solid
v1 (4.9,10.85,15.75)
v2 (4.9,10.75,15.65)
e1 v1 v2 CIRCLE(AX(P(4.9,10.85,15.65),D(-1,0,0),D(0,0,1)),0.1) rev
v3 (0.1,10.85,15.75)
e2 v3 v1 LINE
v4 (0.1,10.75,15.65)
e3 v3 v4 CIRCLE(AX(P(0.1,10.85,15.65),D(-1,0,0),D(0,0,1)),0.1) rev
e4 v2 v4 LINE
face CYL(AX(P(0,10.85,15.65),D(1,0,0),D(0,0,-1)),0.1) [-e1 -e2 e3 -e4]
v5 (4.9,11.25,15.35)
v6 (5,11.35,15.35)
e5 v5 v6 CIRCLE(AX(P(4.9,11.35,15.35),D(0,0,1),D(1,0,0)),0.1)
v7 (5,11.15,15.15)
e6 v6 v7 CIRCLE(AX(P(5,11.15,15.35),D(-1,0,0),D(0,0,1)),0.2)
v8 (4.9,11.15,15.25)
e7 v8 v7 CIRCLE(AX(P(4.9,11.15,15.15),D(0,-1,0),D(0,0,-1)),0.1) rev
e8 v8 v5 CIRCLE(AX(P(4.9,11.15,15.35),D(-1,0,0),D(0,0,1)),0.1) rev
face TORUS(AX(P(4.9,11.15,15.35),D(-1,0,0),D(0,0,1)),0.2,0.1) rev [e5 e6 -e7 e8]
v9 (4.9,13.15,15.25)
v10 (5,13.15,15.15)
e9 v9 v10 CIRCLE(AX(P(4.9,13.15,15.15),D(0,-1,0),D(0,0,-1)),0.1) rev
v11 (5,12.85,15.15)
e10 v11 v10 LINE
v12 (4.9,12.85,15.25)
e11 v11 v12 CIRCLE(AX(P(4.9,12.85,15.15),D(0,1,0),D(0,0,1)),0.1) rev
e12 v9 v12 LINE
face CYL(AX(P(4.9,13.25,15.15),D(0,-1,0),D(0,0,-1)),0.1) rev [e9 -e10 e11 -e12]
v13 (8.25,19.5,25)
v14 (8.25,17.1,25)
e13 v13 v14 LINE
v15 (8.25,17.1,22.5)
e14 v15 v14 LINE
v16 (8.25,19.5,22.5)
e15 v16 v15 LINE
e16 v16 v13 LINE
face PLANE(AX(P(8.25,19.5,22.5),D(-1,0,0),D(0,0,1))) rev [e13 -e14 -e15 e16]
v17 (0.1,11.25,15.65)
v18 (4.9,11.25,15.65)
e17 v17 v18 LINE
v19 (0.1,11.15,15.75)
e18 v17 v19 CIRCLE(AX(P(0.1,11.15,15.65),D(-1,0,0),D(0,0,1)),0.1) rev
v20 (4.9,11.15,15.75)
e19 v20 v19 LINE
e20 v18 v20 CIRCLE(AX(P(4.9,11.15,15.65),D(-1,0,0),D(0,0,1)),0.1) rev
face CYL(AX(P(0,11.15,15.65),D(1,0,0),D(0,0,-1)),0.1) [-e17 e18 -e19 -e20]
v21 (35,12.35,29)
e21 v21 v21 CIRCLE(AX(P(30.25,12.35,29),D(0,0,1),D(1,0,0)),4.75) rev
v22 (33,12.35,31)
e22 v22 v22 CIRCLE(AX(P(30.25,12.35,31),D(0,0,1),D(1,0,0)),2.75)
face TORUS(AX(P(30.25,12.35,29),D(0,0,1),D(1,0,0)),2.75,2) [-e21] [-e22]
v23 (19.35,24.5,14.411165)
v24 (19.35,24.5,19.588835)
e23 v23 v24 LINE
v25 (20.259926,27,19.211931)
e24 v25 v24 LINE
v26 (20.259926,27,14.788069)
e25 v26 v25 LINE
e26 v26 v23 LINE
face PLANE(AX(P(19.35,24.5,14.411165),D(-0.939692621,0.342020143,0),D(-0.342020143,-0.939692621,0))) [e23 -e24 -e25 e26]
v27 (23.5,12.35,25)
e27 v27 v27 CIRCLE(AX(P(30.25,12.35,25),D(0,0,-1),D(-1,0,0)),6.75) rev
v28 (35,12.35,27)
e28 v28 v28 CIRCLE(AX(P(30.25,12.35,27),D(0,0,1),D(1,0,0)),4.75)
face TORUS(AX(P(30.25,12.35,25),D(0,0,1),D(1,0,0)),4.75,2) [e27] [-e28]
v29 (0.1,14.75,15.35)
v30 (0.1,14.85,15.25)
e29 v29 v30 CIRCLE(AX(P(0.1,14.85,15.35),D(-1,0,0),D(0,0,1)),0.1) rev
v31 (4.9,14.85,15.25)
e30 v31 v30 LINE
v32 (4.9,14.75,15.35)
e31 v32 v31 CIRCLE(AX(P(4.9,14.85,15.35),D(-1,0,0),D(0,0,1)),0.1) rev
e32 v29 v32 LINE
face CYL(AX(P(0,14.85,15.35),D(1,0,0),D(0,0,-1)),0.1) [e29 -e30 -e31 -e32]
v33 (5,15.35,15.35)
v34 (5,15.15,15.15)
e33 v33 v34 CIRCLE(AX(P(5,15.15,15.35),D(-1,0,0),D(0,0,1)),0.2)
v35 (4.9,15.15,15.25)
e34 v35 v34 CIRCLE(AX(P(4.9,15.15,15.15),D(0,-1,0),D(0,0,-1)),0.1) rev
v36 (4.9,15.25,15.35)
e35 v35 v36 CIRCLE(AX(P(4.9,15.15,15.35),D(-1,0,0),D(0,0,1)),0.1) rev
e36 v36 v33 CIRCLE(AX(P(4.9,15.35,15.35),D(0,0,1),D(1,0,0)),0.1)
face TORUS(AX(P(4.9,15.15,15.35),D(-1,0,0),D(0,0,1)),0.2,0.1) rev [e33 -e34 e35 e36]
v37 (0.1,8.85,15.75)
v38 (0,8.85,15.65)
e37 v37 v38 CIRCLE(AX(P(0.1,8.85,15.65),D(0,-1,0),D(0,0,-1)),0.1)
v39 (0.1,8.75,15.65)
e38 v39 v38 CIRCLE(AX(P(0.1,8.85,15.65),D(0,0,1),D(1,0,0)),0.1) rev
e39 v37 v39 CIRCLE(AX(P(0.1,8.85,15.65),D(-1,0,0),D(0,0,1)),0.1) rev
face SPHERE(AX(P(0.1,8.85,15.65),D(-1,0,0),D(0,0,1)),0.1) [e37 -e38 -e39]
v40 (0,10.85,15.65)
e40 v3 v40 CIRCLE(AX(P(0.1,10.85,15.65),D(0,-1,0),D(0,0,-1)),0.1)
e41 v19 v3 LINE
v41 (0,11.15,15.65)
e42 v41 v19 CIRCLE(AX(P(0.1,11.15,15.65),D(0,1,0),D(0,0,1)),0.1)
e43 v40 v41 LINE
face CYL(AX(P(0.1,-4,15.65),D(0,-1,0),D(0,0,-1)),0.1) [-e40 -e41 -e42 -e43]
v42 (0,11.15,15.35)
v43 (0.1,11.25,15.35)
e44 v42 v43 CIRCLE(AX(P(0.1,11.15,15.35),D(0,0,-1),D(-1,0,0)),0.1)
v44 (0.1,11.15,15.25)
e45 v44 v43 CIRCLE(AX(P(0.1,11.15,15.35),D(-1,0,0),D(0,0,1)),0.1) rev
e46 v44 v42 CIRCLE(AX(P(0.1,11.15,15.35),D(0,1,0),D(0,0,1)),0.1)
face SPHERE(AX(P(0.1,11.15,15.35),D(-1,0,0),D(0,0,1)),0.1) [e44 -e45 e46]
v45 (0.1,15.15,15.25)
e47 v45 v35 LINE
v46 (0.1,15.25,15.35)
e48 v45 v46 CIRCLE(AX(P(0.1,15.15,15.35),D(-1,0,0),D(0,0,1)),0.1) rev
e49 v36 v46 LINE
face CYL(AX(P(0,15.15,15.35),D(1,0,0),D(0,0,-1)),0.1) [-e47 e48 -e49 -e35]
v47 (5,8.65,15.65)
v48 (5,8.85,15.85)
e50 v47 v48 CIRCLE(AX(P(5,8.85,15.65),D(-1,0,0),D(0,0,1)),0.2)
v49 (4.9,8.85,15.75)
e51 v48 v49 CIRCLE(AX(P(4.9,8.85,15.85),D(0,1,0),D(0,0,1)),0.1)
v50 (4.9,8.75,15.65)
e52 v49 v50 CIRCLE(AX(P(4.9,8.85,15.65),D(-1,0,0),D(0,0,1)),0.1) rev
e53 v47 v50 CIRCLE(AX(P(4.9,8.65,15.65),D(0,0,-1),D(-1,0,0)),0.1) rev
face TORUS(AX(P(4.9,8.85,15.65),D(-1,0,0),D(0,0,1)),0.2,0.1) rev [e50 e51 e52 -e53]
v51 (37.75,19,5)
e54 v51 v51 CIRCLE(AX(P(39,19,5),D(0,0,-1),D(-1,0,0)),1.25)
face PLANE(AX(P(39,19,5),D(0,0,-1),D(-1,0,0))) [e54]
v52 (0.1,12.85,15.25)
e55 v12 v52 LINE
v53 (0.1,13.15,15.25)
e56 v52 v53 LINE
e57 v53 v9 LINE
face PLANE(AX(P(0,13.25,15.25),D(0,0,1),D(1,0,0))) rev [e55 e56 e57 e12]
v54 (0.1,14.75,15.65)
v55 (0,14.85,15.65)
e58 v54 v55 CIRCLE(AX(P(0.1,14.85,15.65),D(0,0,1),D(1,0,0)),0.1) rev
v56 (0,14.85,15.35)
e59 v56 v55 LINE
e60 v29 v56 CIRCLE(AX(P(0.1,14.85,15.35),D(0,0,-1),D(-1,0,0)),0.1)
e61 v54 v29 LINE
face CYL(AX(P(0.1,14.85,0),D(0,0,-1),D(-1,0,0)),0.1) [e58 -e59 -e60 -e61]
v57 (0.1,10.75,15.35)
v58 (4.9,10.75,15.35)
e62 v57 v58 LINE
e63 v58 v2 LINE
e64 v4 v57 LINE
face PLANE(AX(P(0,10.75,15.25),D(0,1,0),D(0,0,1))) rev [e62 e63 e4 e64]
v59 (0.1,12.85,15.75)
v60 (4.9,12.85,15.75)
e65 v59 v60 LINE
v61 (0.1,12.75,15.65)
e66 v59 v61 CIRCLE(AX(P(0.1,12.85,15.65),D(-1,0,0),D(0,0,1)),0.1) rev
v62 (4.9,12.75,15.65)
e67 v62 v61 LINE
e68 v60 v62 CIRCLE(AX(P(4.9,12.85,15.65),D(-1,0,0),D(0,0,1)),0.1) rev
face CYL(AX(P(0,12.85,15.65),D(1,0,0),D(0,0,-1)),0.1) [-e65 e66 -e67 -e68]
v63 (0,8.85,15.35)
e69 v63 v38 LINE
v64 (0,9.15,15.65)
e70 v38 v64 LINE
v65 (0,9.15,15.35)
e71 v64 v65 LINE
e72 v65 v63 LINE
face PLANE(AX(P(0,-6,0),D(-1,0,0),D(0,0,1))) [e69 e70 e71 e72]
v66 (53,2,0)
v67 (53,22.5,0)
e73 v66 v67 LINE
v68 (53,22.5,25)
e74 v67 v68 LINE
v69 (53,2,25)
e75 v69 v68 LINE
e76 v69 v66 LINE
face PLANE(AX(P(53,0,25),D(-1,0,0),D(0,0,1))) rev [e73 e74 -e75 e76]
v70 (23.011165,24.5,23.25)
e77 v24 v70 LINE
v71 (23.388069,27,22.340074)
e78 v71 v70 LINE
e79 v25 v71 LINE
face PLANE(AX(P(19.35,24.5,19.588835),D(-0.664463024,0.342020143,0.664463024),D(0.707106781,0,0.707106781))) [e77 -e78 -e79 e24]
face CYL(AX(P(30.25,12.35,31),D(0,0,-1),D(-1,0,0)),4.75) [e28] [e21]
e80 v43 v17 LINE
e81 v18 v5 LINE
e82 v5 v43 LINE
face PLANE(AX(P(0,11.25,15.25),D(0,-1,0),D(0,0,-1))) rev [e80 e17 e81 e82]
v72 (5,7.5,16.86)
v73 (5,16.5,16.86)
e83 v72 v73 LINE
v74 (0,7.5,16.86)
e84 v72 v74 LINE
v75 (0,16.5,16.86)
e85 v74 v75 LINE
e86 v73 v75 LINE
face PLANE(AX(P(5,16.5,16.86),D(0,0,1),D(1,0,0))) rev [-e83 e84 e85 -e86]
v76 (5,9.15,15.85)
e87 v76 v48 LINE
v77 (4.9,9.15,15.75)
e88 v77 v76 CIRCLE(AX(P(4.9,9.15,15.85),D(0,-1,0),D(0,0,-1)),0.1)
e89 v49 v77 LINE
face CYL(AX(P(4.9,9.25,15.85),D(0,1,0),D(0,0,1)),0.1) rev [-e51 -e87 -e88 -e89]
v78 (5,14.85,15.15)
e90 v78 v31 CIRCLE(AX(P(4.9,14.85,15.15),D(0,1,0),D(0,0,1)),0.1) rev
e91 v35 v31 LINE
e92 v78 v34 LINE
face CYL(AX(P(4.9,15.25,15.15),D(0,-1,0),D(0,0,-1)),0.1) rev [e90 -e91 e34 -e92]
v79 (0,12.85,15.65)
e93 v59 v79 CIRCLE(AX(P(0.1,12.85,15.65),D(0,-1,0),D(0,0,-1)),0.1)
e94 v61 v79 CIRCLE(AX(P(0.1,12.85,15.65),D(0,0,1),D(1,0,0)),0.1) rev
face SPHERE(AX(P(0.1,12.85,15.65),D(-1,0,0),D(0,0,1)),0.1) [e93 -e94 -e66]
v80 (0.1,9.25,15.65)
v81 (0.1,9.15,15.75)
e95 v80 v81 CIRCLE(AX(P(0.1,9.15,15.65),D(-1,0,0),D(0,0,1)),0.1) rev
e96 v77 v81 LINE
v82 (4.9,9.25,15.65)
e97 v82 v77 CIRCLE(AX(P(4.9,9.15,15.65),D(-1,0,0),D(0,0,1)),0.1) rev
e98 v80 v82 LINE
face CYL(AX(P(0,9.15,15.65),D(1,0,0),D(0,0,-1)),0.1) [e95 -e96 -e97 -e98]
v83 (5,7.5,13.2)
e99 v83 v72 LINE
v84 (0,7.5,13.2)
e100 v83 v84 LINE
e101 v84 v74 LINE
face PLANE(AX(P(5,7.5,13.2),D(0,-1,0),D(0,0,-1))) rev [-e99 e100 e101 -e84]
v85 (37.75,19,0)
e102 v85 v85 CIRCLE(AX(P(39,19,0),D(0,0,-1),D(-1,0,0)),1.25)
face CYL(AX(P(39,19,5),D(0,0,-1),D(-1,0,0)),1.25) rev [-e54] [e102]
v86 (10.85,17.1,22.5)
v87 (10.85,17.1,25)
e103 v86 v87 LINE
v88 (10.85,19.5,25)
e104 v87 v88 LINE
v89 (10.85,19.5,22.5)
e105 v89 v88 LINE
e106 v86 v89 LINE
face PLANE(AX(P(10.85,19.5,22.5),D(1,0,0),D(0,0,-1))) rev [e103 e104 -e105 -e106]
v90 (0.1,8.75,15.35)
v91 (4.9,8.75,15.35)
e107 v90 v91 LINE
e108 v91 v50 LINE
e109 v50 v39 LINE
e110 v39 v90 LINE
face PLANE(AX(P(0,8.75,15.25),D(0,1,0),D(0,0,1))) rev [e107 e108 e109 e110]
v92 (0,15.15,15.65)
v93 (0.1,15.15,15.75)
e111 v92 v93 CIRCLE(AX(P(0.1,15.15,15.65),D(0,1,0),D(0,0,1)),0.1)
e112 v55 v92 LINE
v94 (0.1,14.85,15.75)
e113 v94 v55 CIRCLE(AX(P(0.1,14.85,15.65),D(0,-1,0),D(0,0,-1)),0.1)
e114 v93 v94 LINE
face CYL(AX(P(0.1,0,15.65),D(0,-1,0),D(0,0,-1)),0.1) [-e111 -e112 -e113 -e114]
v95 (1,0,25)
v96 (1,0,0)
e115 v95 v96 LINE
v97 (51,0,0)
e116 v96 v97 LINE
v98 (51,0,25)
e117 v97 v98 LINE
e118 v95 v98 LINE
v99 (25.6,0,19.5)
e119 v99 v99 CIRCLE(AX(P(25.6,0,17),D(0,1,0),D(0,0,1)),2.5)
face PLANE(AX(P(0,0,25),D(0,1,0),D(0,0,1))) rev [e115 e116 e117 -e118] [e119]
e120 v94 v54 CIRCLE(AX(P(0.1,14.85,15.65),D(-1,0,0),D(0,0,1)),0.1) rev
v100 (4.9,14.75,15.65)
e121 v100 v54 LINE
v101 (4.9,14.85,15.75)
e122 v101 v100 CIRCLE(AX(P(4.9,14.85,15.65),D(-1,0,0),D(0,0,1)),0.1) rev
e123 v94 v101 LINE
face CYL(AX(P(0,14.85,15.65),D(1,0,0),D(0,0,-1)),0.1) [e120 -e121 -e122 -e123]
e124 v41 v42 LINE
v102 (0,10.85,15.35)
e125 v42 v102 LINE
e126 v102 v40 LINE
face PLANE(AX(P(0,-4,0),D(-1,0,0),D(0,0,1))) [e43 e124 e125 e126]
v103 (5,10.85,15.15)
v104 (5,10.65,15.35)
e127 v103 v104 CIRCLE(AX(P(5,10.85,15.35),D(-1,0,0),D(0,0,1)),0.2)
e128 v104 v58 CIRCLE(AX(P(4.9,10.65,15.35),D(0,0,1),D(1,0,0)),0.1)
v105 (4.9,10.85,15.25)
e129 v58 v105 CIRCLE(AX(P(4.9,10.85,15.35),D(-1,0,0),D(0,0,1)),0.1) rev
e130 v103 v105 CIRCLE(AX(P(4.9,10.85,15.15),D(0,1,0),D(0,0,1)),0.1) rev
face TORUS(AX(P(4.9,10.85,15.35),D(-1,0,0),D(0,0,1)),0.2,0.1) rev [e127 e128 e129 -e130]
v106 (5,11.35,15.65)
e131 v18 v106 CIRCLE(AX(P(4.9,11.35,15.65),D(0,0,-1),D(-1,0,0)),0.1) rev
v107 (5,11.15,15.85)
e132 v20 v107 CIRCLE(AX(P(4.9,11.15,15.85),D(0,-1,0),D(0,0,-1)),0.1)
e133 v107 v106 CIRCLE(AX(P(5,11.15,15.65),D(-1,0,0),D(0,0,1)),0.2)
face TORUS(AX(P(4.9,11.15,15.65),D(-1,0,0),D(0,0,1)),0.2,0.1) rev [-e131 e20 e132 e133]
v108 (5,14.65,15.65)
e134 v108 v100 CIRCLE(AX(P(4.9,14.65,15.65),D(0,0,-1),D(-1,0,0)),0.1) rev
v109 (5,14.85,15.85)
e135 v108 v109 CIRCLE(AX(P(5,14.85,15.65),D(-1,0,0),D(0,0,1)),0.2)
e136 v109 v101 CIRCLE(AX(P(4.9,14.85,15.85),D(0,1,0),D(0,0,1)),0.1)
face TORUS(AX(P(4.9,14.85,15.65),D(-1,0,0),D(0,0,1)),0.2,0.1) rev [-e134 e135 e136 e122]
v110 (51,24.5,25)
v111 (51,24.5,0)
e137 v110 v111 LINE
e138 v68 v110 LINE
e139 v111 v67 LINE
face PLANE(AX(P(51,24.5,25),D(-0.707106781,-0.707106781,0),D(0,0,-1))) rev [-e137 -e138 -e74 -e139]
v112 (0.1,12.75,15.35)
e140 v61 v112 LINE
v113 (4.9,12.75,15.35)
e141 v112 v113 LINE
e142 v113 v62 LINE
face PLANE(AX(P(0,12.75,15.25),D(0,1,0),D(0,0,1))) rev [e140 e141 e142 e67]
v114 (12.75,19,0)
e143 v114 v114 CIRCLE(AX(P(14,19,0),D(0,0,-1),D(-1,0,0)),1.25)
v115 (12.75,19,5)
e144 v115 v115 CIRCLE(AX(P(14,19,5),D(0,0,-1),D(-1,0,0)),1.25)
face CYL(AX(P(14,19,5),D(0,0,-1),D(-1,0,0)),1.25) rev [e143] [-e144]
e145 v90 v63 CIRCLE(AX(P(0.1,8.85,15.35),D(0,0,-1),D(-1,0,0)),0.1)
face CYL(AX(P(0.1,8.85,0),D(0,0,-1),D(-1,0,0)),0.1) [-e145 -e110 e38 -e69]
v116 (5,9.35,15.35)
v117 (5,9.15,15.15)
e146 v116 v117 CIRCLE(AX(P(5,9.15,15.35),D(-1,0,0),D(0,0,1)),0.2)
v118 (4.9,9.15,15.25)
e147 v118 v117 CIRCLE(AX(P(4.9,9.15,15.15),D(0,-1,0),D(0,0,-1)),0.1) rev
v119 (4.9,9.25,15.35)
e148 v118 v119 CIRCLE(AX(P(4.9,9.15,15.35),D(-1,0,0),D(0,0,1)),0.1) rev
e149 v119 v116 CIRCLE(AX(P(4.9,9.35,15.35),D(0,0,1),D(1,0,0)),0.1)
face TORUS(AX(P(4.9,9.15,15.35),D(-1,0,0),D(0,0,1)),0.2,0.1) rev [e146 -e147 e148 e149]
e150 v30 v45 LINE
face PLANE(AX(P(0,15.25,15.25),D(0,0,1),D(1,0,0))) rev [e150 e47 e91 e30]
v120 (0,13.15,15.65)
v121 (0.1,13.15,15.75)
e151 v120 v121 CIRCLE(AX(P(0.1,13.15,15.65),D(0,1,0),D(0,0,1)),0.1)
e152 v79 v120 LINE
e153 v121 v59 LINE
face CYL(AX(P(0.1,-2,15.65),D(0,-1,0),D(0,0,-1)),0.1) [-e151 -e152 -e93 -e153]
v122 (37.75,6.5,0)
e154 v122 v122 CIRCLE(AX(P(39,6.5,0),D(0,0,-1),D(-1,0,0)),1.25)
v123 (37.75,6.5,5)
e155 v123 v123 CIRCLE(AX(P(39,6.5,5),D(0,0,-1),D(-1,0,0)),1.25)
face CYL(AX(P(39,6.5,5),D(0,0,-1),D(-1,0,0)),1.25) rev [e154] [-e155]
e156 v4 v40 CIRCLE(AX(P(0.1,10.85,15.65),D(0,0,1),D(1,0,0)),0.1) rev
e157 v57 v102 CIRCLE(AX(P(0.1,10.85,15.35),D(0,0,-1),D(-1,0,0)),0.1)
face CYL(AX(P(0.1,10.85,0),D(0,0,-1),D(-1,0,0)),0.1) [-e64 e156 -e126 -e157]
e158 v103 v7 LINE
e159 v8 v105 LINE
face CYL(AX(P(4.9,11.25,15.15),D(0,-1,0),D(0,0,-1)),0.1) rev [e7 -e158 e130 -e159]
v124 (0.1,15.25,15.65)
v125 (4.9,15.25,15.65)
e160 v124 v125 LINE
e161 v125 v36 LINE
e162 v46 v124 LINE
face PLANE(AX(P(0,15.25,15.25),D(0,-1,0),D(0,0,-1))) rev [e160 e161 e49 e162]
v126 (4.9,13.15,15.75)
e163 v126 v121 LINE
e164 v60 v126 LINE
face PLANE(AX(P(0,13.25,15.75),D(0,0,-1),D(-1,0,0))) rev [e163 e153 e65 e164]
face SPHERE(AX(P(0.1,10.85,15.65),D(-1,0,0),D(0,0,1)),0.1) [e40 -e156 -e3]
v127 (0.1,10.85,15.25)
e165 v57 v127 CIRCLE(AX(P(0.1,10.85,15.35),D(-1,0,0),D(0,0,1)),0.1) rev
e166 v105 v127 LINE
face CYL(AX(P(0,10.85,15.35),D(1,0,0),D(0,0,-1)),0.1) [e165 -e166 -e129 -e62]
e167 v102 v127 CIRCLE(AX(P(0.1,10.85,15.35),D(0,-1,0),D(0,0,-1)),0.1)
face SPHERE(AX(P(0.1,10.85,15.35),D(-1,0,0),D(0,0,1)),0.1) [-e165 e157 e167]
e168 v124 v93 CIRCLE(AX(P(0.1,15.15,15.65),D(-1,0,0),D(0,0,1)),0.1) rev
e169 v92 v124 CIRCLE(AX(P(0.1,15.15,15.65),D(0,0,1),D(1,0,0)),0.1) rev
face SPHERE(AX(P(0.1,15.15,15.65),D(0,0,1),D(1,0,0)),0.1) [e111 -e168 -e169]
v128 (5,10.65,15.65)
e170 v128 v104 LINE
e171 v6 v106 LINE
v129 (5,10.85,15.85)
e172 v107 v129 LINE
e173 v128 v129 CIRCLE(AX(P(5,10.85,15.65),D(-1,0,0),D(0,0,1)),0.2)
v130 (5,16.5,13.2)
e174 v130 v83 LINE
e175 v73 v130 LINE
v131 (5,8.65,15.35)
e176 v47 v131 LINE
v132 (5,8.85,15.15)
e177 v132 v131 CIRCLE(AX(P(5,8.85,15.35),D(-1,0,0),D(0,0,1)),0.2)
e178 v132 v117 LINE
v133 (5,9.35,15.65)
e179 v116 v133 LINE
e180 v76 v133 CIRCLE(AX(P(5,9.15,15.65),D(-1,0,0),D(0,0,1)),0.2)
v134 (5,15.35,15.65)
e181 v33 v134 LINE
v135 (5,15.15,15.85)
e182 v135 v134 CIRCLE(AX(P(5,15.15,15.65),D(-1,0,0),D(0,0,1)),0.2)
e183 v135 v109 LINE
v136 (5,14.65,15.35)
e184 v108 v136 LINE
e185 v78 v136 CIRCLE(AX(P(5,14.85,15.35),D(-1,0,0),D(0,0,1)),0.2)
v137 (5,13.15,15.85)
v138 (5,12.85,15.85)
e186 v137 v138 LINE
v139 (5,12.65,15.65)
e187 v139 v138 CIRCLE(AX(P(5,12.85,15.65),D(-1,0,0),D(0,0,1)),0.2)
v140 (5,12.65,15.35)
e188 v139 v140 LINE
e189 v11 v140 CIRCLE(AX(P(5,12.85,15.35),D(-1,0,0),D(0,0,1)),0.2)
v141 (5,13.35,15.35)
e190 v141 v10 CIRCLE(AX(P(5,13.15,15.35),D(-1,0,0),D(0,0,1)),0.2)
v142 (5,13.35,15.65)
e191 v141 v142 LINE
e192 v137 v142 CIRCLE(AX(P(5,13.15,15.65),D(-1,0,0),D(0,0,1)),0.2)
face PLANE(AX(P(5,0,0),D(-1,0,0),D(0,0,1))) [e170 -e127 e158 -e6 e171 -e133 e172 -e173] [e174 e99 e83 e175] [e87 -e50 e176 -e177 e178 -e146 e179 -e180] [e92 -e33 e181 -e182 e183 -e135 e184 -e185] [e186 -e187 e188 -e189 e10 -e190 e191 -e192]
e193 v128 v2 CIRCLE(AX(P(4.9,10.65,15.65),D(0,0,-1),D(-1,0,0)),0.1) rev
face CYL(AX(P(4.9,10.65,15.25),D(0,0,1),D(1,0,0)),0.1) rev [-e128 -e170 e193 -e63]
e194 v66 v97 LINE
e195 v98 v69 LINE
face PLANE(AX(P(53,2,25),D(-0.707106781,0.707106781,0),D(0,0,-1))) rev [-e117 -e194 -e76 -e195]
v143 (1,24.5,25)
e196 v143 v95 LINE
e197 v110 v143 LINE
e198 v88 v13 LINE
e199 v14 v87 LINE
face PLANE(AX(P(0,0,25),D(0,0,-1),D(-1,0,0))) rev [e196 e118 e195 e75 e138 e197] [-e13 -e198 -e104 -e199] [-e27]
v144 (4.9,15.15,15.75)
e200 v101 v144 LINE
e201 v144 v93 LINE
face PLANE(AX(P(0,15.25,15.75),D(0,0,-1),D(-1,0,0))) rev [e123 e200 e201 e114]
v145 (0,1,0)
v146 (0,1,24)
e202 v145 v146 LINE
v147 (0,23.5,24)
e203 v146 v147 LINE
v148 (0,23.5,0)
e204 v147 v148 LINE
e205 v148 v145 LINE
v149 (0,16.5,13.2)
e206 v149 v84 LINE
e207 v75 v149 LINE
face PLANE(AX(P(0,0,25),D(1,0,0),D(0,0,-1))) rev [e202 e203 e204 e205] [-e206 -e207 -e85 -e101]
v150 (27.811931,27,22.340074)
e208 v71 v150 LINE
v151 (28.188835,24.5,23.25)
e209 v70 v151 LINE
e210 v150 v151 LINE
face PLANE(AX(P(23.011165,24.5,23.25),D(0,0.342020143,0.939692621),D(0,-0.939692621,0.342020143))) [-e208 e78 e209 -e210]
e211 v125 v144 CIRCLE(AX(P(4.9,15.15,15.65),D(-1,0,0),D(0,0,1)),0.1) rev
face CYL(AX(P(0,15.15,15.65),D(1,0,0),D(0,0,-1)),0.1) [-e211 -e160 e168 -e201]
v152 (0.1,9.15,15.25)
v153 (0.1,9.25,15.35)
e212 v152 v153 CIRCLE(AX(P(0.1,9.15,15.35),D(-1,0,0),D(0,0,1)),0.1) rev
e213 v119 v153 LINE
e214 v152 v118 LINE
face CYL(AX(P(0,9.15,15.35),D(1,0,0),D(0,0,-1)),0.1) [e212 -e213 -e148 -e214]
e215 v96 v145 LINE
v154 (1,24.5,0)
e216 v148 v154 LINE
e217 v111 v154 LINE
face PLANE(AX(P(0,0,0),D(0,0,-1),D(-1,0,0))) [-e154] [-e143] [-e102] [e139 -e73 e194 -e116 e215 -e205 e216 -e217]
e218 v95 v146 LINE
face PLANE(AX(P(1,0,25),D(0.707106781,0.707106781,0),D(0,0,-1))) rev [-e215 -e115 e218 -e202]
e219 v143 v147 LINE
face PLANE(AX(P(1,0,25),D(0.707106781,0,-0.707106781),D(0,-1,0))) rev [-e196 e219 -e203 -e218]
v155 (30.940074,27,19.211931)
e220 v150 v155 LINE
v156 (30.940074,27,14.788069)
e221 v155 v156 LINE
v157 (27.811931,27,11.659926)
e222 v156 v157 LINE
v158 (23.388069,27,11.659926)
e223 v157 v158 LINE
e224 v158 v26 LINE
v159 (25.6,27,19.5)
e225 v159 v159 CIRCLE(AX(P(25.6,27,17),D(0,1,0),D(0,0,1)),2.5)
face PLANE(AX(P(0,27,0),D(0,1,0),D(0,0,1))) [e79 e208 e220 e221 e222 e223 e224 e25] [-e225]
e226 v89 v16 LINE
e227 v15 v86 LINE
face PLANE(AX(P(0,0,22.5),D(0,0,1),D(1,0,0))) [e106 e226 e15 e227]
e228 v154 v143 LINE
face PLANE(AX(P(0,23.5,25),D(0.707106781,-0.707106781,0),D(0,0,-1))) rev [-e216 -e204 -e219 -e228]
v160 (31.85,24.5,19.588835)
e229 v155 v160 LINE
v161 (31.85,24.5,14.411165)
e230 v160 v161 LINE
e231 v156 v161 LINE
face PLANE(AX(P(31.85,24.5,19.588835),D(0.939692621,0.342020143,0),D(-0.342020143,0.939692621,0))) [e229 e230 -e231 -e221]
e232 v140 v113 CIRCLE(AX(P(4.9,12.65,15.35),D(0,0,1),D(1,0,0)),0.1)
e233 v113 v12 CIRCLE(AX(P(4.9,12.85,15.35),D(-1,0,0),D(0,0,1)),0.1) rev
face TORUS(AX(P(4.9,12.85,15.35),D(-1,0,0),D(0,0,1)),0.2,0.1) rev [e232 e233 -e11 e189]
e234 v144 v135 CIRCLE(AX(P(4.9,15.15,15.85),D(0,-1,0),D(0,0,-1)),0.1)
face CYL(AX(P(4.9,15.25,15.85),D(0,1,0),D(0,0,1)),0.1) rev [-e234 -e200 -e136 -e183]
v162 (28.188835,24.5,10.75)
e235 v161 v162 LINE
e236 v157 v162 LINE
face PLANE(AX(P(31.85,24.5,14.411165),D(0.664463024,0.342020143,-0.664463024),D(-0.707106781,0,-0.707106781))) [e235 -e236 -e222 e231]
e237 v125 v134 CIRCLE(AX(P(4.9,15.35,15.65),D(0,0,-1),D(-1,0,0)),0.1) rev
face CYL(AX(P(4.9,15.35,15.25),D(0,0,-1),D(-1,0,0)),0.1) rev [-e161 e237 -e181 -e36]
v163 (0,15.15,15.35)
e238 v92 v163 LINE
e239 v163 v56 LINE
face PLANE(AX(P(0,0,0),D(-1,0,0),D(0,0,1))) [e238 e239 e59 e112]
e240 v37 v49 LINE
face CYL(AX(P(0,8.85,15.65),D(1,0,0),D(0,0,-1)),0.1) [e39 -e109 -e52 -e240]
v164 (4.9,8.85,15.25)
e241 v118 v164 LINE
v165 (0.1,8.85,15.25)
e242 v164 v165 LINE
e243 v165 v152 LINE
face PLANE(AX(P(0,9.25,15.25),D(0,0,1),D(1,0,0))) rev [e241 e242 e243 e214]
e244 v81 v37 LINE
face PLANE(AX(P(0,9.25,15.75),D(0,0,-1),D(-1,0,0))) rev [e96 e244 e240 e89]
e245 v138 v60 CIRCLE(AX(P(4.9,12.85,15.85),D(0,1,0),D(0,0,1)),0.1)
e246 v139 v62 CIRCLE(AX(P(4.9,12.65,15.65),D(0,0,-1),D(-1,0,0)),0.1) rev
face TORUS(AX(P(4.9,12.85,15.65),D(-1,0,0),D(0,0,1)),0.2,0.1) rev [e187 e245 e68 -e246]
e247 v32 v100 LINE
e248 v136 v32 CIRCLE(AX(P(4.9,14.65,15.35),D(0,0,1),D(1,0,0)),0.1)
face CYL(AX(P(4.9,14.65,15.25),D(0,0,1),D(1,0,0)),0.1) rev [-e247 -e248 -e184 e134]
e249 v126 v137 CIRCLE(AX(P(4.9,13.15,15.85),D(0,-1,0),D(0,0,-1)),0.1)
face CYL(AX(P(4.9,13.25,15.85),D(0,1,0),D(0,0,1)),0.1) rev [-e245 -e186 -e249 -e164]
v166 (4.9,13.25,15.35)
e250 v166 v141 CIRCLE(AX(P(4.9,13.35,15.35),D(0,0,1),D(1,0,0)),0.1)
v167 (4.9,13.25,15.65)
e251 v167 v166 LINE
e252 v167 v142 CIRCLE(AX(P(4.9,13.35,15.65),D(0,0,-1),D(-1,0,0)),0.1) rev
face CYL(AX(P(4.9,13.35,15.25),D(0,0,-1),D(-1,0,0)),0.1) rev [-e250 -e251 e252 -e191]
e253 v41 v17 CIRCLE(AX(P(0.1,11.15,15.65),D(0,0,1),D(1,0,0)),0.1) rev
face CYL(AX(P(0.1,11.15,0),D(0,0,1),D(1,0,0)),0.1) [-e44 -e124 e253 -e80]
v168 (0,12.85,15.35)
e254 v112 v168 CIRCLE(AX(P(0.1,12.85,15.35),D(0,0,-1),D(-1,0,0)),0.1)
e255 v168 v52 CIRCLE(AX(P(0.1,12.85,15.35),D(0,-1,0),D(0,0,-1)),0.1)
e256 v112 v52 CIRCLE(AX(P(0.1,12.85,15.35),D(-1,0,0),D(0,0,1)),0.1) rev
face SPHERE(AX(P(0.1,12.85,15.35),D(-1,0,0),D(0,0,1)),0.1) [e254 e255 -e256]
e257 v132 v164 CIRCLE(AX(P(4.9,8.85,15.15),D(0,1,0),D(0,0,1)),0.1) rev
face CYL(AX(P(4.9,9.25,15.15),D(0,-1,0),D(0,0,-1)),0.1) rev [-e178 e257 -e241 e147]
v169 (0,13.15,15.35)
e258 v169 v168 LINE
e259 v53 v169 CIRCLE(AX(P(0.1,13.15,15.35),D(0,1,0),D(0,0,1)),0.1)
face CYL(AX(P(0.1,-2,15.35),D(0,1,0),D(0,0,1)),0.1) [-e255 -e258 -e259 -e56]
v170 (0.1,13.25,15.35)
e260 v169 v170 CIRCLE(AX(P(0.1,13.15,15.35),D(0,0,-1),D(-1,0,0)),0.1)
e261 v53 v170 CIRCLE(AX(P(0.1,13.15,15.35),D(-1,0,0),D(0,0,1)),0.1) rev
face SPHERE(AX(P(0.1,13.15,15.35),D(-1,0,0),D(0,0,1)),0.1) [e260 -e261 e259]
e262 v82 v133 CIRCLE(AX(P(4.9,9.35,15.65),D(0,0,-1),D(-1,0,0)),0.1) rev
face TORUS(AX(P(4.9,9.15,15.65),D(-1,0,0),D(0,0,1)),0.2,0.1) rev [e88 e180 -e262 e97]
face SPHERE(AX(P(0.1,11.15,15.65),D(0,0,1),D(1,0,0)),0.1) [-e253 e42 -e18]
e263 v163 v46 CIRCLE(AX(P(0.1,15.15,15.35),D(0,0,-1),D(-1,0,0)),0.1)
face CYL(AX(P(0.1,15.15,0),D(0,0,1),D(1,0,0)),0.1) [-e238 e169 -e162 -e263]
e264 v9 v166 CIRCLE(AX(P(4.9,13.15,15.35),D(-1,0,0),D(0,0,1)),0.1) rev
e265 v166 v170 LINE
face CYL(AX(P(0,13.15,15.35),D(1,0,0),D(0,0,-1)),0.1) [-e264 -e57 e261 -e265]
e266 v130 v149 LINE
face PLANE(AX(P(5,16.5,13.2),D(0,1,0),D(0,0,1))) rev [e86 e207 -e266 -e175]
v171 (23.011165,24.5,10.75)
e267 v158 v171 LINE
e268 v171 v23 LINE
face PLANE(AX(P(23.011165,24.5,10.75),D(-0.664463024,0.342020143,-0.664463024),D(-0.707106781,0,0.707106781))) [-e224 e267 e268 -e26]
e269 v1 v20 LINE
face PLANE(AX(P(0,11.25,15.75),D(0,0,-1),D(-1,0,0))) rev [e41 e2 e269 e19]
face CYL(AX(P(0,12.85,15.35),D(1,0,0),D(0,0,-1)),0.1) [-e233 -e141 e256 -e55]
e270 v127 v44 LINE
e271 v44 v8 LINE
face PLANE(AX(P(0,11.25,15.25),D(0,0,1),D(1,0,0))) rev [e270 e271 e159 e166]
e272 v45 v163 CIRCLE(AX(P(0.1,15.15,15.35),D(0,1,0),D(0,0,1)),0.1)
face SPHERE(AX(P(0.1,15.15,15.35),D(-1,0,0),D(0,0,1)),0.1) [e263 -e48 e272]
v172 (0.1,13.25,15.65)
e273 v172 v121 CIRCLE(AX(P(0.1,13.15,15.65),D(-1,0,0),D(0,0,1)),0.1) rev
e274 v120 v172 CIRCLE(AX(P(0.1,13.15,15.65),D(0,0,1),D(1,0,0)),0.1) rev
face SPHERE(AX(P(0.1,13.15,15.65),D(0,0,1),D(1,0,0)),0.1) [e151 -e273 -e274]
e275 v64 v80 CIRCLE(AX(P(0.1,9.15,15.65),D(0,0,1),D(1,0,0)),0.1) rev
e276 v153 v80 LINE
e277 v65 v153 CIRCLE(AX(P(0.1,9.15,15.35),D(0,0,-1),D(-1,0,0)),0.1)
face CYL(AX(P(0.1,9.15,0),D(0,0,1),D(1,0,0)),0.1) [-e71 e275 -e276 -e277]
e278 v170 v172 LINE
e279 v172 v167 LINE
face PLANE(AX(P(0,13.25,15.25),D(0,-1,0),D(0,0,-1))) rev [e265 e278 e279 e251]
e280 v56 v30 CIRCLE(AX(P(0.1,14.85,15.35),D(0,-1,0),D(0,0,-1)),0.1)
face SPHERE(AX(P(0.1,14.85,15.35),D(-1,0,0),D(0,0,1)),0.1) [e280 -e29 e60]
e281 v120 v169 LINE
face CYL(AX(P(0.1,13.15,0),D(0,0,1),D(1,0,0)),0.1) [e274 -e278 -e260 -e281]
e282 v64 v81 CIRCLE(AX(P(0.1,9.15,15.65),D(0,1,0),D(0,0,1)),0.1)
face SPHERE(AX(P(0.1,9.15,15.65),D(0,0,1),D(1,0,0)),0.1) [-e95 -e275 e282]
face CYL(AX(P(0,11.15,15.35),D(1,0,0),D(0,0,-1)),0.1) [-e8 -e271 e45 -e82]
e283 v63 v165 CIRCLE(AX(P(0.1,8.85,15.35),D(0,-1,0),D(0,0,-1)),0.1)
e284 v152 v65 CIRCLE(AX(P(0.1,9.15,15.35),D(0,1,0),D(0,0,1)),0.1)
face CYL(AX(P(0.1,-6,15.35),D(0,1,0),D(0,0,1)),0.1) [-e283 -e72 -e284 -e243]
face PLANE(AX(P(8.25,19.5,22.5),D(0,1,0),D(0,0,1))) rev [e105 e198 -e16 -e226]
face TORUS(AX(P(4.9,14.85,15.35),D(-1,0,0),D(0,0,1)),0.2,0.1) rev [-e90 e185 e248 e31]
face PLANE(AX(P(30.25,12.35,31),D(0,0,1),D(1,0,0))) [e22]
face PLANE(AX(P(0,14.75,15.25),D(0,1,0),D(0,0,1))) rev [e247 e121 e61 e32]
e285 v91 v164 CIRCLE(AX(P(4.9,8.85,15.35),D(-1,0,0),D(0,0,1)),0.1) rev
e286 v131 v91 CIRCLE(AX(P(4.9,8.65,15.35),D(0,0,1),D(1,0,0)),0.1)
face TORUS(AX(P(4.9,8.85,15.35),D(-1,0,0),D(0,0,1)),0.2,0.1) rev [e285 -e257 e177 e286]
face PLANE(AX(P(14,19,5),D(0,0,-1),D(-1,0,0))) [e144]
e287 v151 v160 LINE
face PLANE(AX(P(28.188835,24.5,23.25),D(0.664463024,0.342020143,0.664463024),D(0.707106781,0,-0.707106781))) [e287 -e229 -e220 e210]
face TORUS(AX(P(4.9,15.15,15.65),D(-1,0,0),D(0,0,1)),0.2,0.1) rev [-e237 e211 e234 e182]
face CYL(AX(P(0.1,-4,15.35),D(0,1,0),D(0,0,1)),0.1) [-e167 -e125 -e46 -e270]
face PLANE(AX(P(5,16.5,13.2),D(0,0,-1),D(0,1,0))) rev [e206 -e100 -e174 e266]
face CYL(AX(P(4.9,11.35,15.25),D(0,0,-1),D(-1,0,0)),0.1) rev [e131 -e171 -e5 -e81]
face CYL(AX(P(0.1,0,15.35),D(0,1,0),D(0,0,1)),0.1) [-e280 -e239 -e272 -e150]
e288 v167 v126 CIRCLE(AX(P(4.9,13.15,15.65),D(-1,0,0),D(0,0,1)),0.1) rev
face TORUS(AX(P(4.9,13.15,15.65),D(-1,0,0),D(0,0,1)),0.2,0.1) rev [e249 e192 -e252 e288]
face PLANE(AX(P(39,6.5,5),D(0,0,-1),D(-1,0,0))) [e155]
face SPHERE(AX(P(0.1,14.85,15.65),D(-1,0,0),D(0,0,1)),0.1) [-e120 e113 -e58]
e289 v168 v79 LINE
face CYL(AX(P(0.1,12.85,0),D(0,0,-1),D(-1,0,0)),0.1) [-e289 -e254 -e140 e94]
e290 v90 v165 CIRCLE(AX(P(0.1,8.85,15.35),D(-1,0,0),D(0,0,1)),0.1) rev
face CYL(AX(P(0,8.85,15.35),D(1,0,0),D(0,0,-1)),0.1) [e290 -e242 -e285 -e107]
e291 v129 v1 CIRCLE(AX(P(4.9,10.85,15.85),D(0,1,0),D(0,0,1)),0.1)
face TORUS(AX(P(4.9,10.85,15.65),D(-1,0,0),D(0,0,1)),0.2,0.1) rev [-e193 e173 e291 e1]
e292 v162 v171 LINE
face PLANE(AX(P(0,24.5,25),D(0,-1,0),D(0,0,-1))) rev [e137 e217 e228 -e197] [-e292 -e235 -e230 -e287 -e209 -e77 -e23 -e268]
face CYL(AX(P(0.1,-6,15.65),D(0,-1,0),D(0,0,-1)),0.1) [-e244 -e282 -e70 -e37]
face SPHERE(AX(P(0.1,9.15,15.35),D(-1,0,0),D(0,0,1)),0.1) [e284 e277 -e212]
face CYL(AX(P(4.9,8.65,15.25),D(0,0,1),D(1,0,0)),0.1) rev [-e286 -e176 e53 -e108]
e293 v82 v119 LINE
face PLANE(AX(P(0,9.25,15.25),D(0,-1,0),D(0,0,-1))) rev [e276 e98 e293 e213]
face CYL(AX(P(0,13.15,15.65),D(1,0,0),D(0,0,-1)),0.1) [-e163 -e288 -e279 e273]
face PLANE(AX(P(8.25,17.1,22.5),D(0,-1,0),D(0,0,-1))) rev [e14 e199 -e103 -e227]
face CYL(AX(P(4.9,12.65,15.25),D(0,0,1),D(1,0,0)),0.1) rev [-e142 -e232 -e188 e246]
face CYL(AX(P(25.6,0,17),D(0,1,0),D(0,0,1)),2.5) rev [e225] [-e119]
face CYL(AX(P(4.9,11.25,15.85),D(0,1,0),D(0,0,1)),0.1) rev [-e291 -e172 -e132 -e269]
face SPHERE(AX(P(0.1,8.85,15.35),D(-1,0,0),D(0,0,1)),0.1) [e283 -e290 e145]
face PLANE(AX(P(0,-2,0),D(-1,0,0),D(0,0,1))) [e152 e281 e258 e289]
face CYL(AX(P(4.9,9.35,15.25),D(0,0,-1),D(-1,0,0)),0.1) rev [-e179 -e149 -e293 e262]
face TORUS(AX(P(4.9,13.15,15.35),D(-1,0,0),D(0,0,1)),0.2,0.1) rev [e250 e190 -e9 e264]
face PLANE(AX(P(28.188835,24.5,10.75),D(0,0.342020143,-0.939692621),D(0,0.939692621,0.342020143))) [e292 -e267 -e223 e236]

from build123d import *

# Parameters (mm, degrees)
SKETCH1_W              = 53
SKETCH1_H              = 24.5
BOSS_EXTRUDE1_DEPTH    = 25
BOSS_EXTRUDE2_DEPTH    = 2.5
BOSS_EXTRUDE2_TAPER    = 20
SKETCH3_R              = 2.5
CUT_EXTRUDE1_DEPTH     = 65.521314308
SKETCH4_W              = 3.66
SKETCH4_H              = 9
CUT_EXTRUDE2_DEPTH     = 5
SKETCH5_W              = 0.5
SKETCH5_H              = 0.5
BOSS_EXTRUDE3_DEPTH    = 5
FILLET1_R              = 0.1
LPATTERN1_COUNT        = 4
LPATTERN1_PITCH        = 2
FILLET1_OF_LPATTERN1_R = 0.1
SKETCH6_R              = 1.25
CUT_EXTRUDE3_DEPTH     = 5
SKETCH7_W              = 2.6
SKETCH7_H              = 2.4
CUT_EXTRUDE4_DEPTH     = 2.5
SKETCH8_R              = 6.75
BOSS_EXTRUDE4_DEPTH    = 2
FILLET2_R              = 2
SKETCH9_R              = 4.75
BOSS_EXTRUDE5_DEPTH    = 4
FILLET3_R              = 2
CHAMFER1_SIZE          = 1
CHAMFER2_SIZE          = 2


with BuildPart() as part:
    # Sketch1 → Boss-Extrude1 (new body)
    with BuildSketch(Plane.XY):
        with Locations((26.5, 12.25)):
            Rectangle(SKETCH1_W, SKETCH1_H)
    extrude(amount=BOSS_EXTRUDE1_DEPTH)

    # Sketch2 → Boss-Extrude2 (add)
    with BuildSketch(Plane(origin=(0, 24.5, 0), x_dir=(1, 0, 0), z_dir=(0, 1, 0))):
        Polygon((31.85, -19.588834765), (31.85, -14.411165235), (28.188834765, -10.75), (23.011165235, -10.75), (19.35, -14.411165235), (19.35, -19.588834765), (23.011165235, -23.25), (28.188834765, -23.25), align=None)
    extrude(amount=BOSS_EXTRUDE2_DEPTH, taper=BOSS_EXTRUDE2_TAPER)

    # Sketch3 → Cut-Extrude1 (cut, through all)
    with BuildSketch(Plane(origin=(0, 27, 0), x_dir=(1, 0, 0), z_dir=(0, 1, 0))):
        with Locations(Location((25.6, -17, 0), (0, 0, 270))):
            Circle(SKETCH3_R)
    extrude(amount=-CUT_EXTRUDE1_DEPTH, mode=Mode.SUBTRACT)

    # Sketch4 → Cut-Extrude2 (cut)
    with BuildSketch(Plane.ZY):
        with Locations((15.03, 12)):
            Rectangle(SKETCH4_W, SKETCH4_H)
    extrude(amount=-CUT_EXTRUDE2_DEPTH, mode=Mode.SUBTRACT)

    # Sketch5 → Boss-Extrude3 (add)
    with BuildSketch(Plane.ZY.offset(-5)):
        with Locations((15.5, 15)):
            Rectangle(SKETCH5_W, SKETCH5_H)
    boss_extrude3 = extrude(amount=BOSS_EXTRUDE3_DEPTH)

    # Fillet1
    fillet1_edges = [part.edges().sort_by_distance(p)[0] for p in [
        (5, 15, 15.25),
        (2.5, 15.25, 15.25),
        (5, 14.75, 15.5),
        (2.5, 14.75, 15.25),
        (5, 15, 15.75),
        (2.5, 14.75, 15.75),
        (5, 15.25, 15.5),
        (2.5, 15.25, 15.75),
        (0, 15, 15.25),
        (0, 14.75, 15.5),
        (0, 15, 15.75),
        (0, 15.25, 15.5),
    ]]
    fillet(fillet1_edges, radius=FILLET1_R)

    # LPattern1: Boss-Extrude3 ×4
    with Locations(*[(0, -i * LPATTERN1_PITCH, 0) for i in range(1, LPATTERN1_COUNT)]):
        add(boss_extrude3)

    # Fillet1 of LPattern1
    fillet1_of_lpattern1_edges = [part.edges().sort_by_distance(p)[0] for p in [
        (5, 13, 15.25),
        (2.5, 13.25, 15.25),
        (5, 12.75, 15.5),
        (2.5, 12.75, 15.25),
        (5, 13, 15.75),
        (2.5, 12.75, 15.75),
        (5, 13.25, 15.5),
        (2.5, 13.25, 15.75),
        (0, 13, 15.25),
        (0, 12.75, 15.5),
        (0, 13, 15.75),
        (0, 13.25, 15.5),
        (5, 11, 15.25),
        (2.5, 11.25, 15.25),
        (5, 10.75, 15.5),
        (2.5, 10.75, 15.25),
        (5, 11, 15.75),
        (2.5, 10.75, 15.75),
        (5, 11.25, 15.5),
        (2.5, 11.25, 15.75),
        (0, 11, 15.25),
        (0, 10.75, 15.5),
        (0, 11, 15.75),
        (0, 11.25, 15.5),
        (5, 9, 15.25),
        (2.5, 9.25, 15.25),
        (5, 8.75, 15.5),
        (2.5, 8.75, 15.25),
        (5, 9, 15.75),
        (2.5, 8.75, 15.75),
        (5, 9.25, 15.5),
        (2.5, 9.25, 15.75),
        (0, 9, 15.25),
        (0, 8.75, 15.5),
        (0, 9, 15.75),
        (0, 9.25, 15.5),
    ]]
    fillet(fillet1_of_lpattern1_edges, radius=FILLET1_OF_LPATTERN1_R)

    # Sketch6 → Cut-Extrude3 (cut)
    with BuildSketch(Plane(origin=(0, 0, 0), x_dir=(-1, 0, 0), z_dir=(0, 0, -1))):
        with Locations((-39, 19)):
            Circle(SKETCH6_R)
        with Locations((-39, 6.5)):
            Circle(SKETCH6_R)
        with Locations((-14, 19)):
            Circle(SKETCH6_R)
    extrude(amount=-CUT_EXTRUDE3_DEPTH, mode=Mode.SUBTRACT)

    # Sketch7 → Cut-Extrude4 (cut)
    with BuildSketch(Plane.XY.offset(25)):
        with Locations((9.55, 18.3)):
            Rectangle(SKETCH7_W, SKETCH7_H)
    extrude(amount=-CUT_EXTRUDE4_DEPTH, mode=Mode.SUBTRACT)

    # Sketch8 → Boss-Extrude4 (add)
    with BuildSketch(Plane.XY.offset(25)):
        with Locations(Location((30.25, 12.35, 0), (0, 0, 180))):
            Circle(SKETCH8_R)
    extrude(amount=BOSS_EXTRUDE4_DEPTH)

    # Fillet2
    fillet2_edges = [part.edges().sort_by_distance(p)[0] for p in [
        (37, 12.35, 27),
    ]]
    fillet(fillet2_edges, radius=FILLET2_R - 0.0001)  # a hair under: the kernel refuses the full size

    # Sketch9 → Boss-Extrude5 (add)
    with BuildSketch(Plane.XY.offset(27)):
        with Locations((30.25, 12.35)):
            Circle(SKETCH9_R)
    extrude(amount=BOSS_EXTRUDE5_DEPTH)

    # Fillet3
    fillet3_edges = [part.edges().sort_by_distance(p)[0] for p in [
        (25.5, 12.35, 31),
    ]]
    fillet(fillet3_edges, radius=FILLET3_R)

    # Chamfer1
    chamfer1_edges = [part.edges().sort_by_distance(p)[0] for p in [
        (0, 12.25, 25),
        (0, 24.5, 12.5),
        (0, 0, 12.5),
    ]]
    chamfer(chamfer1_edges, length=CHAMFER1_SIZE)

    # Chamfer2
    chamfer2_edges = [part.edges().sort_by_distance(p)[0] for p in [
        (53, 24.5, 12.5),
        (53, 0, 12.5),
    ]]
    chamfer(chamfer2_edges, length=CHAMFER2_SIZE)


solid = part.part
